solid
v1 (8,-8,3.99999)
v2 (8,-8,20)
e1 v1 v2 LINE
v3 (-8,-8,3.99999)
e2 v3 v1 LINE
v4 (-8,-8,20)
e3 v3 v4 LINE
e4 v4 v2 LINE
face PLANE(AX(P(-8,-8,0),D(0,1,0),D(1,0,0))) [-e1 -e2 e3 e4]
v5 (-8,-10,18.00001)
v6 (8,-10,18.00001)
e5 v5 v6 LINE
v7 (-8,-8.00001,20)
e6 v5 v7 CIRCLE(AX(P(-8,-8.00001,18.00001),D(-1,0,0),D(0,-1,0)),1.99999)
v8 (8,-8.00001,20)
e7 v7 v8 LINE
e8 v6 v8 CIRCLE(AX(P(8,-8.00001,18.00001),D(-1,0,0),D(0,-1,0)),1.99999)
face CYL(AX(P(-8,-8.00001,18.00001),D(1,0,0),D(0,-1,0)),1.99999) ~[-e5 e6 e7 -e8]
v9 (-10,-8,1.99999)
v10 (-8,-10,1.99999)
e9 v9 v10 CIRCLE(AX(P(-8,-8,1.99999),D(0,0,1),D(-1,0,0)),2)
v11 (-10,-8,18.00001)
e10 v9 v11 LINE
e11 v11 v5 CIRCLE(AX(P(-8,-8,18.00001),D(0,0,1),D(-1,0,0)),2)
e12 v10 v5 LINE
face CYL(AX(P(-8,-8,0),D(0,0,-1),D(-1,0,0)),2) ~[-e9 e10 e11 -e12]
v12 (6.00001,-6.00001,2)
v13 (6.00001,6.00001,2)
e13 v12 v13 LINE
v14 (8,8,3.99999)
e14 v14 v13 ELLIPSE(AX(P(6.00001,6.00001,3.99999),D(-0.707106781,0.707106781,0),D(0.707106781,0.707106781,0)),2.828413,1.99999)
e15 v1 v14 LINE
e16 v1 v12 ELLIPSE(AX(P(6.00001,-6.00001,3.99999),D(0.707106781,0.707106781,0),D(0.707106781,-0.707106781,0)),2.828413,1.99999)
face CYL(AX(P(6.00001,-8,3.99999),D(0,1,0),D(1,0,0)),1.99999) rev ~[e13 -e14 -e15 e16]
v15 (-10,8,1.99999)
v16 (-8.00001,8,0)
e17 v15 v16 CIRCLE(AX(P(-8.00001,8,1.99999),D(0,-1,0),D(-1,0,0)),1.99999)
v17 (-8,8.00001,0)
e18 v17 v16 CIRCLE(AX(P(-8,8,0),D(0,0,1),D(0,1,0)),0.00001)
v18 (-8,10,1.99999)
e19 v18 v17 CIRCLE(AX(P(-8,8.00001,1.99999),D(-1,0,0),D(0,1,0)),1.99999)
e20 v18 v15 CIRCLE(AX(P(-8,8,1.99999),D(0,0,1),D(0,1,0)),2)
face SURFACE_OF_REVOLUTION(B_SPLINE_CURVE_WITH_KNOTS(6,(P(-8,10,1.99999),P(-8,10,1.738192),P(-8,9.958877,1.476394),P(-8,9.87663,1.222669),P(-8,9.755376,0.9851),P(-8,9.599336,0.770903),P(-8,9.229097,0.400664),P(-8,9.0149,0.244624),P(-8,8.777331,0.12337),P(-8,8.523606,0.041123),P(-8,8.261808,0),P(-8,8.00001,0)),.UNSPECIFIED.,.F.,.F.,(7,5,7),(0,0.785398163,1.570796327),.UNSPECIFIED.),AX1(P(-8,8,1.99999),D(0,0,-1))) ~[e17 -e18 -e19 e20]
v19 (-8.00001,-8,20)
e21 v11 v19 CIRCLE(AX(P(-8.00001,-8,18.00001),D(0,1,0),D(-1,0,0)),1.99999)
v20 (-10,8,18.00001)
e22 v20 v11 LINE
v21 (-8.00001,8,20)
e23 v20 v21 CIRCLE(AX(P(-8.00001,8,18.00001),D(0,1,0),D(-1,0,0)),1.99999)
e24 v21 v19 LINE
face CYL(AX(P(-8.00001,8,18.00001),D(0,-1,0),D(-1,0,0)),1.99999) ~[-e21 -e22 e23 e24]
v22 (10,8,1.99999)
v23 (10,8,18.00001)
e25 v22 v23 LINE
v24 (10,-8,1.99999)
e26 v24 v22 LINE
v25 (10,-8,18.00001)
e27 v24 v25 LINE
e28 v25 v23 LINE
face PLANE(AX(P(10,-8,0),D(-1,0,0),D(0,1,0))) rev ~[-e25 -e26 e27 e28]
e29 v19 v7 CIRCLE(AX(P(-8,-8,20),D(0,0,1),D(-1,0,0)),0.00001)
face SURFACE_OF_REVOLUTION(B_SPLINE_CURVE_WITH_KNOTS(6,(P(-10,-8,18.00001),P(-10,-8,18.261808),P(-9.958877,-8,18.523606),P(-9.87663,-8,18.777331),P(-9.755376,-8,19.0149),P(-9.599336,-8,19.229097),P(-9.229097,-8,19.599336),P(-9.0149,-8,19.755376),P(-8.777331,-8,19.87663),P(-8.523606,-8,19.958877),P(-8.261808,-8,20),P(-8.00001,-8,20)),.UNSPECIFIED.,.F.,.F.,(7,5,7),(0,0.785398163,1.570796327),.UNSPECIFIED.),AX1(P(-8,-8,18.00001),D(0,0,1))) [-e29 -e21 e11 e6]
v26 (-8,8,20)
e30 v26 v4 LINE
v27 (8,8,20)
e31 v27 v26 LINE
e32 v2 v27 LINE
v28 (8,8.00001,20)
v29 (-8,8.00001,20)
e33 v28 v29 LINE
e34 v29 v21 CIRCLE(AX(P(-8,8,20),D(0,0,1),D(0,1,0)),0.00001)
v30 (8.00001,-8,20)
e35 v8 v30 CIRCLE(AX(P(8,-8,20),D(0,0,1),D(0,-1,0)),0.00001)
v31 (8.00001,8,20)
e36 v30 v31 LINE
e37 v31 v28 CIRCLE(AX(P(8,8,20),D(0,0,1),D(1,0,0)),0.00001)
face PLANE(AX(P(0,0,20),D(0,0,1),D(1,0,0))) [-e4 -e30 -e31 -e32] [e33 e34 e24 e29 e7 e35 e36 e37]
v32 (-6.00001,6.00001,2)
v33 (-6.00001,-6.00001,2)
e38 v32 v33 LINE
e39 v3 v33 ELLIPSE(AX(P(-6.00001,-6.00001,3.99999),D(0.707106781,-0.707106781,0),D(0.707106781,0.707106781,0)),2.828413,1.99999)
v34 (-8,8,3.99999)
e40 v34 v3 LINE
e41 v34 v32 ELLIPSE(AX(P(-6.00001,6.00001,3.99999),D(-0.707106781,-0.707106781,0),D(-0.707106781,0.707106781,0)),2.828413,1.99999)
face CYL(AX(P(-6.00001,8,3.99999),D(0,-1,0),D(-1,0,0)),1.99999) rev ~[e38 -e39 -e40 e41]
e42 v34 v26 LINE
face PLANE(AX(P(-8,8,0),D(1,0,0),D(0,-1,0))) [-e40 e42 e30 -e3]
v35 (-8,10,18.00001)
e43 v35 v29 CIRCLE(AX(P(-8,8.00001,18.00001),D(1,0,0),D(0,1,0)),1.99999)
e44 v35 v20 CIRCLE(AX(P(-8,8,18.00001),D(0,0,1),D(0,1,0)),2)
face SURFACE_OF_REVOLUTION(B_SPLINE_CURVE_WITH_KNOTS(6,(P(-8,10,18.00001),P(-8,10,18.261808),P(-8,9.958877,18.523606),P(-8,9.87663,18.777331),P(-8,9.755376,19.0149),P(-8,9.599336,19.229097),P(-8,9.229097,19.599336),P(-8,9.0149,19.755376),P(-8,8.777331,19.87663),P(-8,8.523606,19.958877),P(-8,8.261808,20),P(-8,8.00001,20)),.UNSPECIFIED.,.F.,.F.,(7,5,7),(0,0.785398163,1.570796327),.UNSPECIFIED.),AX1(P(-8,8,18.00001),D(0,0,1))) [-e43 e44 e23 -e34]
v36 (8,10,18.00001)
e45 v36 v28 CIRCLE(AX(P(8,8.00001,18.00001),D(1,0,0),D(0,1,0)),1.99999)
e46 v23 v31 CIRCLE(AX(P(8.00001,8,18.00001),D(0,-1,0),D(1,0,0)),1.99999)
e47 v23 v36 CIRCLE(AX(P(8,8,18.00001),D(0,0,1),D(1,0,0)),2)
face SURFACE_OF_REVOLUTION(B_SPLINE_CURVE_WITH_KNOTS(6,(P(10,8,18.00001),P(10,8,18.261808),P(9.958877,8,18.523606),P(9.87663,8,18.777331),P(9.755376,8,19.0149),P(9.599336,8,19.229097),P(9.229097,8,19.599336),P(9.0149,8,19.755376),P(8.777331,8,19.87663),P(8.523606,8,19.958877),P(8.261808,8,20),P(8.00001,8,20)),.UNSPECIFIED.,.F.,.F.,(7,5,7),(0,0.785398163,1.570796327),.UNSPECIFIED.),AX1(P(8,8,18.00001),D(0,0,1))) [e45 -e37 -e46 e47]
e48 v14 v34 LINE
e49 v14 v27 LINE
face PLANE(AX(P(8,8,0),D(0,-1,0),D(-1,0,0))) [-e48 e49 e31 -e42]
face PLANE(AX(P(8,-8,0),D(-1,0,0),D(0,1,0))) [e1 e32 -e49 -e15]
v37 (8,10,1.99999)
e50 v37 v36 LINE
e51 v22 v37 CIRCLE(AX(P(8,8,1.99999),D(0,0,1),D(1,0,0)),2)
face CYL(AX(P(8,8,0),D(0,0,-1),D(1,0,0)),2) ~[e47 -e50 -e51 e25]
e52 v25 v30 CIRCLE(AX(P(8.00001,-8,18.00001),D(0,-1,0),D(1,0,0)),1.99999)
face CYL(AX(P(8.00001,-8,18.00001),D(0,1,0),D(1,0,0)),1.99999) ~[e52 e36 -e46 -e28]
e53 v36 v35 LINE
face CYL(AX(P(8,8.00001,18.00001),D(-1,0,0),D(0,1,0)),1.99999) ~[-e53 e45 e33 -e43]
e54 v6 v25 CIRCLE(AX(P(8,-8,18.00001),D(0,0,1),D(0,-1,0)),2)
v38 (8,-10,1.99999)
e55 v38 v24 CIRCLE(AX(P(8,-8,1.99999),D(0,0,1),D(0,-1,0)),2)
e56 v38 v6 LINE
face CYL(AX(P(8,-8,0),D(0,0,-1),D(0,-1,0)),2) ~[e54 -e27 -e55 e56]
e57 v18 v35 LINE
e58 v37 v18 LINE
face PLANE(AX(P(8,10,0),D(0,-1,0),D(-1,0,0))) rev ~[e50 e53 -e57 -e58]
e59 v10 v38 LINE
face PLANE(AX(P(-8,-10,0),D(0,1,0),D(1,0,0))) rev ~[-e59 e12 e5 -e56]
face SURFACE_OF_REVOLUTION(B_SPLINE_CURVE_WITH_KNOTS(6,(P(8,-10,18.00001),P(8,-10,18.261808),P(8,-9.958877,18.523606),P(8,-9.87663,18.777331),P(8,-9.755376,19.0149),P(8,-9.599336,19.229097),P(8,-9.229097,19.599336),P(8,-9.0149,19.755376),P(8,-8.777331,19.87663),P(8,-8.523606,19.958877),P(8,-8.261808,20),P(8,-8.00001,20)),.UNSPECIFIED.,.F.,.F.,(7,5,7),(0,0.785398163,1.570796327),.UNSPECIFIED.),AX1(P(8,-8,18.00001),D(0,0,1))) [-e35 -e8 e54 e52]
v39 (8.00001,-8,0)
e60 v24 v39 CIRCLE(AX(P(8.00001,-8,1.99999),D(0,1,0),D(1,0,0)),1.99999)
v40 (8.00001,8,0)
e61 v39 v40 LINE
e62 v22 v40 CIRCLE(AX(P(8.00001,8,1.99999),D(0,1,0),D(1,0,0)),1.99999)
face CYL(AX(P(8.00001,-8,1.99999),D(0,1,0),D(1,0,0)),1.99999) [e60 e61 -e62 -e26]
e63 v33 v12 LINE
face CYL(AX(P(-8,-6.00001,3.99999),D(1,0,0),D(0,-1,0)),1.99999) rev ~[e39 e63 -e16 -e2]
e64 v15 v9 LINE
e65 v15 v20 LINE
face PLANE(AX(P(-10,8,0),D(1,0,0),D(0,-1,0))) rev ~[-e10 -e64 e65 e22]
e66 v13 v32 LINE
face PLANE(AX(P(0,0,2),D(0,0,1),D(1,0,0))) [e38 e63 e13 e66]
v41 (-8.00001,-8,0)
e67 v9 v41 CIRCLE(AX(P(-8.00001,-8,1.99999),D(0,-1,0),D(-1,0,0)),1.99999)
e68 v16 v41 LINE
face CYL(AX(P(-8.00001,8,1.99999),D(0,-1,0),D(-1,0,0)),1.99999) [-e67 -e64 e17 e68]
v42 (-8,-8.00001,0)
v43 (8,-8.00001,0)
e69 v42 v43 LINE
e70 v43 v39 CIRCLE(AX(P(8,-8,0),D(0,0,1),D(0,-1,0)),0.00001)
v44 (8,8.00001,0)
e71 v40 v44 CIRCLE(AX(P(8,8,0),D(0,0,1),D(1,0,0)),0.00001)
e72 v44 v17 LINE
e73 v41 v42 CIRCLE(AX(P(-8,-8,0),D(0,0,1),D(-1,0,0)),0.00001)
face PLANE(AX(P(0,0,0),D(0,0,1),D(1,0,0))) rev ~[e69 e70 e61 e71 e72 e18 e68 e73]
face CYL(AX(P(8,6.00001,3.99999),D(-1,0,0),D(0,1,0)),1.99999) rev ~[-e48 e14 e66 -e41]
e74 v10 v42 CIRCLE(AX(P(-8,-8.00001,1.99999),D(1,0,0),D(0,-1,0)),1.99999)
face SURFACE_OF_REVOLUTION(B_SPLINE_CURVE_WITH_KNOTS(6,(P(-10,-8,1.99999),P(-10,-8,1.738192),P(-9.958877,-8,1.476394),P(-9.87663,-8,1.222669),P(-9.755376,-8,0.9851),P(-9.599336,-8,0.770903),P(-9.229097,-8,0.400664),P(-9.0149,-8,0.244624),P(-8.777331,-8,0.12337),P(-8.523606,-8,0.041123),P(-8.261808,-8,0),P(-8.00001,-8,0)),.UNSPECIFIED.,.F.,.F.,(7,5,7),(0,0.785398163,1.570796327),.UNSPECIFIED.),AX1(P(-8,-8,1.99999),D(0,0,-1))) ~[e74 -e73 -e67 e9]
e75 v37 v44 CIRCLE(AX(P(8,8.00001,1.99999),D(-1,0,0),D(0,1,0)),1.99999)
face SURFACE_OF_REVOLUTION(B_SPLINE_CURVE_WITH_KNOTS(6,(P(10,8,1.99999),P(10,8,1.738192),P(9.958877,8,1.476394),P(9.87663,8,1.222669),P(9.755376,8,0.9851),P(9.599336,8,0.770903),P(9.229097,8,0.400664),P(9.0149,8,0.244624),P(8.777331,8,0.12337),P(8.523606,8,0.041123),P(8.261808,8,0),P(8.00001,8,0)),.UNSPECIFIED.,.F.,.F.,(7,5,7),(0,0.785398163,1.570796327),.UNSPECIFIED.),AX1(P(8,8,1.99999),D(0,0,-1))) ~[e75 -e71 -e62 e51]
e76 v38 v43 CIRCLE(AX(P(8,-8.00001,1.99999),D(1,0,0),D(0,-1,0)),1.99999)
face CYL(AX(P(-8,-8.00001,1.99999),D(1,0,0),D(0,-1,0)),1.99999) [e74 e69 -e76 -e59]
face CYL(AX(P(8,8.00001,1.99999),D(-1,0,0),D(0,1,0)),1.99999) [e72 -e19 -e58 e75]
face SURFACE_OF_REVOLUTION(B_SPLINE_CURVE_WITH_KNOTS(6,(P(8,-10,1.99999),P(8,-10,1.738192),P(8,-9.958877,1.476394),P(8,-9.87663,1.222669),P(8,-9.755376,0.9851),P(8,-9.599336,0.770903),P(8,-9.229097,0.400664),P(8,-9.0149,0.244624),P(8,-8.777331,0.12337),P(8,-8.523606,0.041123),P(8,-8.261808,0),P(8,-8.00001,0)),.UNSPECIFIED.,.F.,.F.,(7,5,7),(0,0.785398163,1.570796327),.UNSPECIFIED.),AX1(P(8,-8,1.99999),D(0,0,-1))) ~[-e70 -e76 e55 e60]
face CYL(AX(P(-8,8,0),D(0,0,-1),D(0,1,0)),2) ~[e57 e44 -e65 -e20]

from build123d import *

# Parameters (mm, degrees)
F1_DEPTH = 20
F3_T     = 2
F4_R     = 1.99999


# Not quite as in the source:
# - a fillet or chamfer is up to 0.001 mm smaller than in the source, because OpenCascade refuses the exact size
# - a feature of the source that left no trace in its solid (it failed there, or was rolled back) is left out
# - a shell that OpenCascade refuses in one call is made with other operations: the cavity is built on its own and cut out


with BuildPart() as f1:
    # F0 (on Top) → F1 (new body)
    with BuildSketch(Plane.XY):
        with BuildLine():
            Line((-8, -10), (8, -10))
            ThreePointArc((8, -10), (9.4142135624, -9.4142135624), (10, -8))
            Line((10, -8), (10, 8))
            ThreePointArc((10, 8), (9.4142135624, 9.4142135624), (8, 10))
            Line((8, 10), (-8, 10))
            ThreePointArc((-8, 10), (-9.4142135624, 9.4142135624), (-10, 8))
            Line((-10, 8), (-10, -8))
            ThreePointArc((-10, -8), (-9.4142135624, -9.4142135624), (-8, -10))
        make_face()
    extrude(amount=F1_DEPTH)

    # F3: shell of thickness 2, made by hand


with BuildPart() as f3_core1:
    # F3_t2: copy of F1
    add(f1.part)

    # the walls: a layer under each face that stays
    f3_faces = [f3_core1.faces().sort_by_distance(p)[0] for p in [
        (0, -10, 10),
        (10, 0, 10),
        (0, 10, 10),
        (-10, 0, 10),
        (0, 0, 0),
    ]]
    thicken(f3_faces, amount=-F3_T, mode=Mode.SUBTRACT)


with BuildPart() as f1_1:
    add(f1.part)

    # what is left inside the walls is the cavity
    f3_cavity = [f3_core1.part.solids().sort_by_distance(p)[0] for p in [
        (0, -7.98, 14),
    ]]
    add(f3_cavity, mode=Mode.SUBTRACT)

    # F4 (radius 2 in the source; OpenCascade refuses exactly that, so slightly less here)
    f4_edges = [f1_1.edges().sort_by_distance(p)[0] for p in [
        (0, -10, 0),
        (0, -10, 20),
        (-9.414214, -9.414214, 0),
        (-9.414214, -9.414214, 20),
        (9.414214, -9.414214, 0),
        (9.414214, -9.414214, 20),
        (10, 0, 0),
        (9.414214, 9.414214, 0),
        (0, 10, 0),
        (-9.414214, 9.414214, 0),
        (-10, 0, 0),
        (-10, 0, 20),
        (10, 0, 20),
        (-9.414214, 9.414214, 20),
        (9.414214, 9.414214, 20),
        (0, 10, 20),
        (0, -8, 2),
        (8, 0, 2),
        (0, 8, 2),
        (-8, 0, 2),
    ]]
    fillet(f4_edges, radius=F4_R)


solid = f1_1.part
